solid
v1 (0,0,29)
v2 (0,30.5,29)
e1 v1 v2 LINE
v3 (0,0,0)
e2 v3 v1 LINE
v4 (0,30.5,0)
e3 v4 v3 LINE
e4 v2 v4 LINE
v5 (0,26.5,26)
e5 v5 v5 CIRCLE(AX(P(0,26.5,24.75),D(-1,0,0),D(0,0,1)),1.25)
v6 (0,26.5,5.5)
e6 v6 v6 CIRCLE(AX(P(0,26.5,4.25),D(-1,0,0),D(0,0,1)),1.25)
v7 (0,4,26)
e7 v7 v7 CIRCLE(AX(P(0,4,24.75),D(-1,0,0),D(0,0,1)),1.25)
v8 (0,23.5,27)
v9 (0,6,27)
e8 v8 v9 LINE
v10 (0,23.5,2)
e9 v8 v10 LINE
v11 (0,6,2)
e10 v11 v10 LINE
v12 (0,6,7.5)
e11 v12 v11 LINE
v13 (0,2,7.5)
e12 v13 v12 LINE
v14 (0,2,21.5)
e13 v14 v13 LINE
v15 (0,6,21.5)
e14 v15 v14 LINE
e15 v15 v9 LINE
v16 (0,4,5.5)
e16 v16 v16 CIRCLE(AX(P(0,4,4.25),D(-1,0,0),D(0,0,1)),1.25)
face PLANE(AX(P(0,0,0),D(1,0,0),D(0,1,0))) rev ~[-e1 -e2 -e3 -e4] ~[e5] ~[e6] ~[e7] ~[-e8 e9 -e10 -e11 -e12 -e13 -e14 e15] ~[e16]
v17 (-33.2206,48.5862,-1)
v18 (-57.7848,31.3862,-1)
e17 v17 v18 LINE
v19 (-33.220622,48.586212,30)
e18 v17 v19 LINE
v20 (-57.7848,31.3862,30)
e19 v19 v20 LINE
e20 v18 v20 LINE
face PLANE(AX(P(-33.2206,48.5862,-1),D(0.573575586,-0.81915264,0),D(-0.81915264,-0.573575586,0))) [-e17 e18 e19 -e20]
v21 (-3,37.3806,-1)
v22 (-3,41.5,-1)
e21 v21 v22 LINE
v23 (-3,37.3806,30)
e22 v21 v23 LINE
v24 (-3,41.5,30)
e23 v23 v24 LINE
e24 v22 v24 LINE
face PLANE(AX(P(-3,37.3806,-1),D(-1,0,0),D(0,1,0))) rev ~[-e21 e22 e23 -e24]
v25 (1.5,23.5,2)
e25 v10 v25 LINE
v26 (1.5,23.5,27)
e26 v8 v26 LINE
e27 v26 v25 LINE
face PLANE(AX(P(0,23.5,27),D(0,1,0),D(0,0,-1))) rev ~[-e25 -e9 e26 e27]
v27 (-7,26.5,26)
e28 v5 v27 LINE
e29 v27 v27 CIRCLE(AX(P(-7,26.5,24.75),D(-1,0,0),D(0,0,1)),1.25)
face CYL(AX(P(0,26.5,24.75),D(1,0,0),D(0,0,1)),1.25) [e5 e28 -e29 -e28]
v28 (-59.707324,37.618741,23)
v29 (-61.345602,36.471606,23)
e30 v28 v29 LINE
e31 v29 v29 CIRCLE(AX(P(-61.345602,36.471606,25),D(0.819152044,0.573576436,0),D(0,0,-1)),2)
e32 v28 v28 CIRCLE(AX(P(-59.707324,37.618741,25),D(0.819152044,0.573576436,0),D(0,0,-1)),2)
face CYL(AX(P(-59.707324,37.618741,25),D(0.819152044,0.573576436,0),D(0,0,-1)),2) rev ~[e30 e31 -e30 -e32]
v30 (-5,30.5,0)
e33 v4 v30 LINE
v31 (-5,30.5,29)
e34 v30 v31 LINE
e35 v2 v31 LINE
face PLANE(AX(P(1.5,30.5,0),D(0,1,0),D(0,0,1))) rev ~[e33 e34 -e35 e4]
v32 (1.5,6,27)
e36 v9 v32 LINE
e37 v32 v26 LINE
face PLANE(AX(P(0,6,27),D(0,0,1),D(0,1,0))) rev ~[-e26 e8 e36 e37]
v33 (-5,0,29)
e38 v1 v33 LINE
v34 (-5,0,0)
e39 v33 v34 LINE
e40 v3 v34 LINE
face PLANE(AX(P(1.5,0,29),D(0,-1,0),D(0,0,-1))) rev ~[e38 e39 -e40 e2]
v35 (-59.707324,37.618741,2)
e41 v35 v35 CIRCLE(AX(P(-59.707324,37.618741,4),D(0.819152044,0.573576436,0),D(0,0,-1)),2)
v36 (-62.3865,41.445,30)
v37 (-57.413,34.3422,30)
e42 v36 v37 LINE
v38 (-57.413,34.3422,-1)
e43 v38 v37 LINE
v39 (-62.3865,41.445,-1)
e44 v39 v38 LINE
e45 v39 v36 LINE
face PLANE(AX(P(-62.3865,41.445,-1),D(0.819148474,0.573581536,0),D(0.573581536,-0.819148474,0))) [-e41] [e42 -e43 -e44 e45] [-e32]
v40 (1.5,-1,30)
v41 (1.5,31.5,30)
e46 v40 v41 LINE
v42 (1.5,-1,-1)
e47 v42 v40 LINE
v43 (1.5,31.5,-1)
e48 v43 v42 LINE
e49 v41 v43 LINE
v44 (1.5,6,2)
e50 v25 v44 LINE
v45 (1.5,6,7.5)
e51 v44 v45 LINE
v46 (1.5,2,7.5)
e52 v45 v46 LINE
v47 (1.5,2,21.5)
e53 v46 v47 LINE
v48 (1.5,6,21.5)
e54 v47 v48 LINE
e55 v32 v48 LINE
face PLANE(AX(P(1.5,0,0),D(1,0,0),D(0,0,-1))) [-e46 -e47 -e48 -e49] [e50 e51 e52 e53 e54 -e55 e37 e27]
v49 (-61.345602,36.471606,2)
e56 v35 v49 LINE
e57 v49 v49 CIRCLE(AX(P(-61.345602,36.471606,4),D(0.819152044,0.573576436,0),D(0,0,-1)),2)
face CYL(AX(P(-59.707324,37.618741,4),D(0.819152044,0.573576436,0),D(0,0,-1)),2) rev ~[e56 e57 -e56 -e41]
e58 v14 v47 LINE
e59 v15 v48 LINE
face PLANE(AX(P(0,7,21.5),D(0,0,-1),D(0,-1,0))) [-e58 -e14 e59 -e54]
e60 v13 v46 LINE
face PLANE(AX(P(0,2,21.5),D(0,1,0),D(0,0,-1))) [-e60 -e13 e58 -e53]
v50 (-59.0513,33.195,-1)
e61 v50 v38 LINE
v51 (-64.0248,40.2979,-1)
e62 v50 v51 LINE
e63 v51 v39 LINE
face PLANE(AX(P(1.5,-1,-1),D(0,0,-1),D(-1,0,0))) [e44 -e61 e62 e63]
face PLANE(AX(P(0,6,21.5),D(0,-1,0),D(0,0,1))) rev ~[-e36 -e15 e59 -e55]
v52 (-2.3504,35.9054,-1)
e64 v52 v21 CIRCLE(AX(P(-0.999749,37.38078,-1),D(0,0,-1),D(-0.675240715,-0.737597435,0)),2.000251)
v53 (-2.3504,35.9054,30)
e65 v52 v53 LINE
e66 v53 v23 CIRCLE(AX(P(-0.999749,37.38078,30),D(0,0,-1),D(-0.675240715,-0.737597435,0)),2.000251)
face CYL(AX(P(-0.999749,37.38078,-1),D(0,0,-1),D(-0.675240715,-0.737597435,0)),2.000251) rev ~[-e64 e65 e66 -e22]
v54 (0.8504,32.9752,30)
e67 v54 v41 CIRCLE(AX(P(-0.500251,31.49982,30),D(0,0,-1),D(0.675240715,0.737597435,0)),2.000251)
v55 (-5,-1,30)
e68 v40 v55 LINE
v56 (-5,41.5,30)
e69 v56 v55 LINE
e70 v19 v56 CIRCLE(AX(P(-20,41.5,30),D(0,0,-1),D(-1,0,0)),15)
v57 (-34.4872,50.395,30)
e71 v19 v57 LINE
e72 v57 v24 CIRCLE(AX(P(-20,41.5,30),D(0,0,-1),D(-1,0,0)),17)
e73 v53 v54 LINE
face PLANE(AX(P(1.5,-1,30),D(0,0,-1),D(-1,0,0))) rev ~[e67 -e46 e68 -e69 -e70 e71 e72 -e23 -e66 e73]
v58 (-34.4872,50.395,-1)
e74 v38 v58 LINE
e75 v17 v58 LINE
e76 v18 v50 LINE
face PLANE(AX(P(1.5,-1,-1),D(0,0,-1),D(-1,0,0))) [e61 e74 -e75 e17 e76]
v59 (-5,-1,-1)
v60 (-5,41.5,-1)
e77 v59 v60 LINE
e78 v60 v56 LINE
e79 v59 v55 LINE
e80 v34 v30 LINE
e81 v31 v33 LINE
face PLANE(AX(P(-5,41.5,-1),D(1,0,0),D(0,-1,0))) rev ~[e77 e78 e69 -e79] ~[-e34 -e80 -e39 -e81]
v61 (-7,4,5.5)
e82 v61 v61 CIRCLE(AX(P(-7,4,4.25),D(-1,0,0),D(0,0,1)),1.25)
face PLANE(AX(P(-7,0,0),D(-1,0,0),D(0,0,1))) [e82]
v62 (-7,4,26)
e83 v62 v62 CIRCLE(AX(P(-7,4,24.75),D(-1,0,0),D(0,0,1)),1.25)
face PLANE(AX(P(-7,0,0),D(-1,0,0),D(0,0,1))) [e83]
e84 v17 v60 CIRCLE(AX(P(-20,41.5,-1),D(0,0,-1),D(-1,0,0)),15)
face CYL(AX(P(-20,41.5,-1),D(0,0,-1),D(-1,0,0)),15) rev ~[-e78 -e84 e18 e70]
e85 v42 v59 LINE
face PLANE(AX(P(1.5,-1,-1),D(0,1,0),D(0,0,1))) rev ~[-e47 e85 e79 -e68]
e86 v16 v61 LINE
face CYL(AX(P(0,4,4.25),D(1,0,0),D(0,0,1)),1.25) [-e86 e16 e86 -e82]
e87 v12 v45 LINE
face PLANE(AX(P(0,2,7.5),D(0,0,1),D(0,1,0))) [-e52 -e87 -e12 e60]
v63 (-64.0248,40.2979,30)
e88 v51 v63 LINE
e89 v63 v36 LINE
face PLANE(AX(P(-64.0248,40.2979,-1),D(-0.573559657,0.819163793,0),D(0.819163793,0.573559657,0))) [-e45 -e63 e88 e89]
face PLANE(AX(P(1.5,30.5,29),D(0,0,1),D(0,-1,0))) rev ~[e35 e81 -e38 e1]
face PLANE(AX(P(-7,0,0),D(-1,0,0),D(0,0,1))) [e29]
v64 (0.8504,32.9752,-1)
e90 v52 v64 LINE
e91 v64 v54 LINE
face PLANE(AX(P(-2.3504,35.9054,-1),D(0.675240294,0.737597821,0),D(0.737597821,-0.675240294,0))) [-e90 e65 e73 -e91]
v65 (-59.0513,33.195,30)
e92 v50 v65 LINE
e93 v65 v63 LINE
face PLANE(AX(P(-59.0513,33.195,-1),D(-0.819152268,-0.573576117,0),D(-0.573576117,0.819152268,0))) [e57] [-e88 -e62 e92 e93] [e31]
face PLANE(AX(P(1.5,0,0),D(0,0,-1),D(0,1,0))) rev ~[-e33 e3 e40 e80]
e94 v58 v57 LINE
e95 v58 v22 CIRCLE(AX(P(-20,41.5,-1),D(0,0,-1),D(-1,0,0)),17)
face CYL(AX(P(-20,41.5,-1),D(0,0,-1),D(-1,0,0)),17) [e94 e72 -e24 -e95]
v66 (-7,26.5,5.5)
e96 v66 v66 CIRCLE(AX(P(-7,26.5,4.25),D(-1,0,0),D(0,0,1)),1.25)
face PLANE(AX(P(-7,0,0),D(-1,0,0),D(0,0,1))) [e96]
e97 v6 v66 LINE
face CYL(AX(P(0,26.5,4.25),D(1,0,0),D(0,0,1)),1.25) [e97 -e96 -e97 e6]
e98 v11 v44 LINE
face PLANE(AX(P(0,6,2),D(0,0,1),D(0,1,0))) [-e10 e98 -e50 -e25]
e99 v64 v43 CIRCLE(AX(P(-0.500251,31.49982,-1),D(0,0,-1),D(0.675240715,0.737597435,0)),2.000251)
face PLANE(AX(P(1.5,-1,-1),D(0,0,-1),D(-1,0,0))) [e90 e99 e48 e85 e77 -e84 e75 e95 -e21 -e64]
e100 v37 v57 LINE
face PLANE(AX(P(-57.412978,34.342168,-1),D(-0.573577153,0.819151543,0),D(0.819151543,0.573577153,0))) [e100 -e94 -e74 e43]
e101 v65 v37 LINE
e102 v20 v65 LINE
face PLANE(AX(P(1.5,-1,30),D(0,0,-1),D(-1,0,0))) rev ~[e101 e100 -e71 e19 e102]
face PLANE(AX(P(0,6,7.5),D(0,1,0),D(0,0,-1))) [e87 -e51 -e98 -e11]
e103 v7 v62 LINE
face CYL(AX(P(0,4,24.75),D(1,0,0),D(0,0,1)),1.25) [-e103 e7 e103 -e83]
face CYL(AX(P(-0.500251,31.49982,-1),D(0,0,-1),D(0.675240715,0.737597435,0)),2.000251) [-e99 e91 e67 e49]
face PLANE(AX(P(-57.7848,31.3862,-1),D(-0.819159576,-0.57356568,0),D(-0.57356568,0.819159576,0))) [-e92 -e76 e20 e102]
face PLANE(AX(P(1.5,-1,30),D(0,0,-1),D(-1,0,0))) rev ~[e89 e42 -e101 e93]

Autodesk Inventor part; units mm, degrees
ref_plane "YZ Plane" through (0, 0, 0) normal (1, 0, 0) x (0, 1, 0)
ref_plane "XZ Plane" through (0, 0, 0) normal (0, 1, 0) x (-1, 0, 0)
ref_plane "XY Plane" through (0, 0, 0) normal (0, 0, 1) x (1, 0, 0)
sketch "Skizze2" plane through (0, 0, 0) normal (1, 0, 0) x (0, 1, 0)
  line L0 (30.5, 0) -> (0, 0)
  line L1 (0, 0) -> (0, 29)
  line L2 (0, 29) -> (30.5, 29)
  line L3 (30.5, 29) -> (30.5, 0)
  line L4 (0, -5.8) -> (0, 34.8) projected
  line L5 (-26.8, 0) -> (40.05, 0) projected
  line L6 (23.5, 2) -> (7, 2)
  line L7 (7, 2) -> (7, 27)
  line L8 (7, 27) -> (23.5, 27)
  line L9 (23.5, 27) -> (23.5, 2)
  point P0 (0, 0)
  dimension "d2" = 30.5
  dimension "d3" = 29
  dimension "d4" = 2
  dimension "d5" = 2
  dimension "d6" = 7
  dimension "d7" = 7
extrude "Extrusion1" add sketch "Skizze2" along normal blind 1.5
sketch "Skizze4" plane through (0, 0, 0) normal (-1, 0, 0) x (0, 0, 1)
  line L0 (27, 7) -> (27, 23.5) projected
  line L1 (2, 23.5) -> (2, 7) projected
  line L2 (27, 23.5) -> (2, 23.5) projected
  line L3 (2, 7) -> (27, 7) projected
  circle A0 centre (4.25, 26.5) radius 1.25
  circle A1 centre (24.75, 26.5) radius 1.25
  circle A2 centre (4.25, 4) radius 1.25
  circle A3 centre (24.75, 4) radius 1.25
  point P0 (0, 0)
  dimension "d24" = 2.5
  dimension "d25" = 3
  dimension "d28" = 20.5
  dimension "d31" = 22.5
  dimension "d34" = 2.25
extrude "Extrusion2" add sketch "Skizze4" along normal blind 7 contours A0 | A1 | A2 | A3
sketch "Skizze5" plane through (0, 0, 0) normal (-1, 0, 0) x (0, 0, 1)
  line L0 (7.5, 7) -> (21.5, 7)
  line L1 (21.5, 7) -> (21.5, 2)
  line L2 (21.5, 2) -> (7.5, 2)
  line L3 (7.5, 2) -> (7.5, 7)
  line L4 (2, 7) -> (27, 7) projected
  circle A0 centre (4.25, 4) radius 1.25 projected
  circle A1 centre (24.75, 4) radius 1.25 projected
  line L5 (29, 0) -> (0, 0) projected
  dimension "d35" = 2
  dimension "d36" = 2
  dimension "d37" = 2
extrude "Extrusion3" cut sketch "Skizze5" against normal through all contours L0 L1 L2 L3
sketch "Skizze6" plane through (0, 0, 0) normal (-1, 0, 0) x (0, 0, 1)
  line L0 (2, 7) -> (7.5, 7) projected
  line L1 (7.5, 2) -> (7.5, 7) projected
  line L2 (2, 7) -> (7.5, 7)
  line L3 (7.5, 7) -> (7.5, 6)
  line L4 (7.5, 6) -> (2, 6)
  line L5 (2, 6) -> (2, 7)
  line L6 (27, 7) -> (21.5, 7)
  line L7 (21.5, 7) -> (21.5, 6)
  line L8 (21.5, 6) -> (27, 6)
  line L9 (27, 6) -> (27, 7)
  line L10 (21.5, 7) -> (21.5, 2) projected
  point P0 (0, 0)
  dimension "d40" = 1
extrude "Extrusion4" cut sketch "Skizze6" against normal through all
sketch "Skizze8" plane through (1.5, 0, 0) normal (1, 0, 0) x (0, 0, -1)
  line L0 (-30, 31.5) -> (1, 31.5)
  line L1 (1, 31.5) -> (1, -1)
  line L2 (1, -1) -> (-30, -1)
  line L3 (-30, -1) -> (-30, 31.5)
  line L4 (-29, 0) -> (0, 0) projected
  line L5 (0, 0) -> (0, 30.5) projected
  line L6 (0, 30.5) -> (-29, 30.5) projected
  line L7 (-29, 30.5) -> (-29, 0) projected
  line L8 (-29, 30.5) -> (0, 30.5)
  line L9 (0, 30.5) -> (0, 0)
  line L10 (0, 0) -> (-29, 0)
  line L11 (-29, 0) -> (-29, 30.5)
  dimension "d43" = 1
  dimension "d44" = 1
  dimension "d45" = 1
  dimension "d46" = 1
extrude "Extrusion5" add sketch "Skizze8" against normal blind 6.5
sketch "Skizze9" plane through (1.5, -1, -1) normal (0, 0, -1) x (-1, 0, 0)
  line L0 (6.5, 32.5) -> (6.5, 0) projected
  line L1 (0, 32.5) -> (6.5, 32.5) projected
  line L2 (0, 0) -> (0, 32.5) projected
  line L3 (0, 32.5) -> (6.5, 32.5)
  line L4 (6.5, 32.5) -> (6.5, 37.5)
  line L5 (0, 31.7695) -> (0, 32.5)
  line L6 (6.5, 37.5) -> (4.5, 37.5)
  line L7 (3.8504, 36.9054) -> (0.6496, 33.9752)
  arc A0 (0.6496, 33.9752) -> (0, 32.5) centre (2, 32.5) ccw
  line L8 (4.5, 38.3806) -> (4.5, 42.5)
  line L9 (4.5, 42.5) -> (6.5, 42.5)
  line L10 (6.5, 42.5) -> (6.5, 37.5)
  arc A1 (3.8504, 36.9054) -> (4.5, 38.3806) centre (2.5, 38.3806) ccw
  point P0 (1.5, 1)
  point P1 (-0.2652, 33.1379)
  dimension "d58" = 2
  dimension "d60" = 2
  dimension "d61" = 5
  dimension "d62" = 2
  dimension "d63" = 10
extrude "Extrusion6" add sketch "Skizze9" against normal blind 31
sketch "Skizze12" plane through (1.5, -1, -1) normal (0, 0, -1) x (-1, 0, 0)
  circle A0 centre (21.5, 42.5) radius 15
  circle A1 centre (21.5, 42.5) radius 17
  line L0 (4.5, 42.5) -> (4.5, 38.3806) projected
  line L1 (6.5, 42.5) -> (4.5, 42.5) projected
  line L2 (4.5, 42.5) -> (38.5, 42.5)
  point P0 (1.5, 1)
  point P1 (36.5, 42.5)
  dimension "d64" = 30
extrude "Extrusion7" add sketch "Skizze12" against normal blind 31 contours A0 L1 A1 L2 picked at (5.4766, 45.0527)
sketch "Skizze13" plane through (1.5, -1, -1) normal (0, 0, -1) x (-1, 0, 0)
  line L0 (0, 0) -> (6.5, 0) projected
  line L1 (0, 0) -> (35.9872, 51.395)
  arc A0 (38.5, 42.5) -> (4.5, 42.5) centre (21.5, 42.5) ccw projected
  line L2 (0, 0) -> (0, 32.5) projected
  arc A1 (38.5, 42.5) -> (35.9872, 51.395) centre (21.5, 42.5) ccw
  arc A2 (36.5, 42.5) -> (6.5, 42.5) centre (21.5, 42.5) ccw projected
  line L3 (38.5, 42.5) -> (36.5, 42.5)
  arc A3 (36.5, 42.5) -> (34.7206, 49.5862) centre (21.5, 42.5) ccw
  point P0 (1.5, 1)
  dimension "d67" = 35
extrude "Extrusion8" cut sketch "Skizze13" against normal through all
sketch "Skizze14" plane through (1.5, -1, -1) normal (0, 0, -1) x (-1, 0, 0)
  arc A0 (34.7206, 49.5862) -> (6.5, 42.5) centre (21.5, 42.5) ccw projected
  circle A1 centre (21.5, 42.5) radius 15
  line L0 (34.7206, 49.5862) -> (59.2848, 32.3862)
  line L1 (59.2848, 32.3862) -> (60.5513, 34.195)
  arc A2 (35.9872, 51.395) -> (4.5, 42.5) centre (21.5, 42.5) ccw projected
  line L2 (60.5513, 34.195) -> (35.9872, 51.395)
  line L3 (34.7206, 49.5862) -> (35.9872, 51.395) projected
  line L4 (60.5513, 34.195) -> (65.5248, 41.2979)
  line L5 (65.5248, 41.2979) -> (63.8865, 42.445)
  line L6 (63.8865, 42.445) -> (58.913, 35.3422)
  point P0 (1.5, 1)
  dimension "d70" = 90
  dimension "d72" = 2
  dimension "d73" = 17.2
  dimension "d74" = 90
  dimension "d76" = 8.25
extrude "Extrusion9" add sketch "Skizze14" against normal blind 31 contours L3 L2 L1 L0 | L2 L6 L5 L4
sketch "Skizze15" plane through (-62.3865, 41.445, 30) normal (0.819152, 0.5735764, 0) x (0, 0, -1)
  circle A0 centre (26, -4.671) radius 2
  circle A1 centre (5, -4.671) radius 2
  line L0 (31, 0) -> (31, -8.671) projected
  line L1 (0, -8.671) -> (0, 0) projected
  line L2 (31, -8.671) -> (0, -8.671) projected
  point P0 (30, -69.7332)
  point P1 (31, -4.3355)
  dimension "d79" = 4
  dimension "d80" = 4
  dimension "d82" = 5
  dimension "d83" = 4
  dimension "d84" = 4
  dimension "d85" = 5
extrude "Extrusion10" cut sketch "Skizze15" against normal through all
properties part number "Bildschirmhalter"
